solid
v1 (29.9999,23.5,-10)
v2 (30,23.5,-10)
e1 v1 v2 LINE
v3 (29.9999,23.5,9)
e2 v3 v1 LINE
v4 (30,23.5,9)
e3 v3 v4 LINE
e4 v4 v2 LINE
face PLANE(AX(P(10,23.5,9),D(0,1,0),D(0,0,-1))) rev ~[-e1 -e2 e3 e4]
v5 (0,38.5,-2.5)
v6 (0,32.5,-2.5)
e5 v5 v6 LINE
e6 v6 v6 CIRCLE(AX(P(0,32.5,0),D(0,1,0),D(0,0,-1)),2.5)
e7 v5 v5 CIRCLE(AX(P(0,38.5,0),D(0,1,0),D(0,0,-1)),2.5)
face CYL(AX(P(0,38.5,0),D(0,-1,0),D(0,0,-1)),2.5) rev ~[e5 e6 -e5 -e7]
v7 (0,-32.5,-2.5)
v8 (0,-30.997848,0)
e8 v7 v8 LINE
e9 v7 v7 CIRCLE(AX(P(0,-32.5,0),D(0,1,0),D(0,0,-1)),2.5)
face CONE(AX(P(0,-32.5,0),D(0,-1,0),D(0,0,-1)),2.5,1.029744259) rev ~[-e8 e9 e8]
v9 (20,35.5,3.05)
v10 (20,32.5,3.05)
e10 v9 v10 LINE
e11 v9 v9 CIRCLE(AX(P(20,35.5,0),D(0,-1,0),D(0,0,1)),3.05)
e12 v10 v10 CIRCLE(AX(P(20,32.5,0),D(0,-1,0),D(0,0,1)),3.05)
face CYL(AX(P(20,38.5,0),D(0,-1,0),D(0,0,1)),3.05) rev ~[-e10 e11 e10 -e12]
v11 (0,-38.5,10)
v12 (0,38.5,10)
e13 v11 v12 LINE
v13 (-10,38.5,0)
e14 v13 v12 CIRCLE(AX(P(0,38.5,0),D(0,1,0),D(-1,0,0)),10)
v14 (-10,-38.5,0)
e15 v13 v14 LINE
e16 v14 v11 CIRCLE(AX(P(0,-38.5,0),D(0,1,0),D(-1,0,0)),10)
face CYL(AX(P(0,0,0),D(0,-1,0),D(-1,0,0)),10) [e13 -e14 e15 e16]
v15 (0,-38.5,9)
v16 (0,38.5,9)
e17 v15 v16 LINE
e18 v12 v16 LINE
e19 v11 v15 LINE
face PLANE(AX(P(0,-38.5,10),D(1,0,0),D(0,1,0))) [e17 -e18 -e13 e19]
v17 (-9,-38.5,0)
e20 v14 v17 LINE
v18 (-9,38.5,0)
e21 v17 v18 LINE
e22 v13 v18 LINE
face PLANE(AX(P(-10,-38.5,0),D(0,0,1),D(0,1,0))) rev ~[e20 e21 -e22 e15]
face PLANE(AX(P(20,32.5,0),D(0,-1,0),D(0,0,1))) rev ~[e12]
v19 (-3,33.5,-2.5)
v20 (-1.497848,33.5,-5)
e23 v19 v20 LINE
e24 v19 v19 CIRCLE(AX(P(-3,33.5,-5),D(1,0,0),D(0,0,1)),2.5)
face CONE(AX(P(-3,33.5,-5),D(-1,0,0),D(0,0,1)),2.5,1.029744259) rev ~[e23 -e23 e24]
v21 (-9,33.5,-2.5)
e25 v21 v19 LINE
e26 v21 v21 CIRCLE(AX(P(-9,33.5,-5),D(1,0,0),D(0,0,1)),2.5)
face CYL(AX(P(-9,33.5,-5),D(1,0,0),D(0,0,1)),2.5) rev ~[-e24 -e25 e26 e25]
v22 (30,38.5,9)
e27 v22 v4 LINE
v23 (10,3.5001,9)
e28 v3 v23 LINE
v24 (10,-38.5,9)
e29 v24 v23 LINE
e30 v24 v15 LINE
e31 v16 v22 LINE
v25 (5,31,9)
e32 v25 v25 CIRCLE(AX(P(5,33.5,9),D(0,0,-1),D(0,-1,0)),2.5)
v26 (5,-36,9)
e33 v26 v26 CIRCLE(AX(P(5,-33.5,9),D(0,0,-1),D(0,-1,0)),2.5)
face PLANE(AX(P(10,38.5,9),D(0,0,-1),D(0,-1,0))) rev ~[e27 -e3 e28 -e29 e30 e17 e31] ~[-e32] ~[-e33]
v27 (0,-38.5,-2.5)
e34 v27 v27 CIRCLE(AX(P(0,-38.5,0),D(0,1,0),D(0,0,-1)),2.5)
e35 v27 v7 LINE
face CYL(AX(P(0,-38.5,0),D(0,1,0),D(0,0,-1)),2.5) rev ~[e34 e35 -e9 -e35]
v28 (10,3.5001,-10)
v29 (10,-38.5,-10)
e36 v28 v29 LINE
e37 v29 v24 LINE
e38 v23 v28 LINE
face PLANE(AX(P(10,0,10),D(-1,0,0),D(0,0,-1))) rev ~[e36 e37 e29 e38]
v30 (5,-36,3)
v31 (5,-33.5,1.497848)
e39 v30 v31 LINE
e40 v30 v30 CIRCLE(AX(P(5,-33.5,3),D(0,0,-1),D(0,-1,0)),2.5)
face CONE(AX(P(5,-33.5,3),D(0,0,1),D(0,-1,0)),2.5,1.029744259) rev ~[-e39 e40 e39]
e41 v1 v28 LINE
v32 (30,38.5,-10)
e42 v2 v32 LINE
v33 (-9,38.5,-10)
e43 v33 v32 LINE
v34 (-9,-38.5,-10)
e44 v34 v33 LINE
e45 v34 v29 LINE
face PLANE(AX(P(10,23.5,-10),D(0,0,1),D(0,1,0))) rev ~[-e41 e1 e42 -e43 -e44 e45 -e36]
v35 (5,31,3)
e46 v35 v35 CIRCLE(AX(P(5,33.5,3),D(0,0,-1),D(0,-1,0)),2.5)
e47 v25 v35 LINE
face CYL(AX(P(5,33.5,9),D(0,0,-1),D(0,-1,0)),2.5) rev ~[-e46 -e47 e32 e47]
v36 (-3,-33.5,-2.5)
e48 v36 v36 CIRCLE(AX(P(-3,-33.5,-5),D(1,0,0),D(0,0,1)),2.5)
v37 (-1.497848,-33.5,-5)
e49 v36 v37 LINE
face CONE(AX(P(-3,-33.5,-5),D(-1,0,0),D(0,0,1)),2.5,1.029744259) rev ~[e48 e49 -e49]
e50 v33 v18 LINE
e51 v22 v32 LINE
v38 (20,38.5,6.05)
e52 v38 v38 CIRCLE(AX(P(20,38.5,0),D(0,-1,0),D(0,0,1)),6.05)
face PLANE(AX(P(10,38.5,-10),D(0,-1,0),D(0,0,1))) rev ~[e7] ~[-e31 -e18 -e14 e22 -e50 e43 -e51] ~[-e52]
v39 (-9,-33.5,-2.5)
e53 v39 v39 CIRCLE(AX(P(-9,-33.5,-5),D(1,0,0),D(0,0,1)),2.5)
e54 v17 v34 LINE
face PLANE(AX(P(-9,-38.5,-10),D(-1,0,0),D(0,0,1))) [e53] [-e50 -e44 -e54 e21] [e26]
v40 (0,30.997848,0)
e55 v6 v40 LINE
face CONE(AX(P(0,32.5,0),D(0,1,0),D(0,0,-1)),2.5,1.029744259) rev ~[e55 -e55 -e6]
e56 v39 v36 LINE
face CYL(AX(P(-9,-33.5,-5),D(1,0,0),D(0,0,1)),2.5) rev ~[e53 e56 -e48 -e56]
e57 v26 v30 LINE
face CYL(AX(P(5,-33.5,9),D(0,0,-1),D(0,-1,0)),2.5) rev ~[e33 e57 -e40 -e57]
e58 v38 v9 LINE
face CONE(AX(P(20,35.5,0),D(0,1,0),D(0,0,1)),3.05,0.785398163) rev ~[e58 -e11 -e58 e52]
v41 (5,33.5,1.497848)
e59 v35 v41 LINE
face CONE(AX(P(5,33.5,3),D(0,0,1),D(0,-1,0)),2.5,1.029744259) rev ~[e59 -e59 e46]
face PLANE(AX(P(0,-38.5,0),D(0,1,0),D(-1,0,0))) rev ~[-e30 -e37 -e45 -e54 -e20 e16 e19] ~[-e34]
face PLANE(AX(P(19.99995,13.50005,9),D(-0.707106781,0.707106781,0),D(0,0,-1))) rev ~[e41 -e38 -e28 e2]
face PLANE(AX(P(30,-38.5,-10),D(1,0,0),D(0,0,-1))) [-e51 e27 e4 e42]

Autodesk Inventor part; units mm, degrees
ref_plane "YZ Plane" through (0, 0, 0) normal (1, 0, 0) x (0, 1, 0)
ref_plane "XZ Plane" through (0, 0, 0) normal (0, 1, 0) x (-1, 0, 0)
ref_plane "XY Plane" through (0, 0, 0) normal (0, 0, 1) x (1, 0, 0)
sketch "スケッチ1" plane through (0, 0, 0) normal (0, 1, 0) x (-1, 0, 0)
  circle A0 centre (0, 0) radius 10
  line L0 (0, 10) -> (-10, 10)
  line L1 (-10, 10) -> (-10, -10)
  line L2 (-10, -10) -> (10, -10)
  line L3 (10, -10) -> (10, 0)
  dimension "d0" = 20
  dimension "d1" = 10
  dimension "d2" = 10
extrude "押し出し1" add sketch "スケッチ1" along normal mid plane 77
sketch "スケッチ2" plane through (0, -38.5, 10) normal (0, 0, 1) x (1, 0, 0)
  line L0 (10, 0) -> (10, 77) projected
  line L1 (0, 77) -> (10, 77) projected
  line L2 (0, 0) -> (0, 77) projected
  line L3 (10, 0) -> (0, 0) projected
extrude "押し出し2" cut sketch "スケッチ2" against normal blind 1
sketch "スケッチ3" plane through (-10, -38.5, -10) normal (-1, 0, 0) x (0, 0, 1)
  line L0 (0, 77) -> (10, 77) projected
  line L1 (10, 0) -> (10, 77) projected
  line L2 (10, 0) -> (0, 0) projected
  line L3 (0, 0) -> (0, 77) projected
  point P0 (10, 38.5)
extrude "押し出し3" cut sketch "スケッチ3" against normal blind 1
sketch "スケッチ4" plane through (0, -38.5, 9) normal (0, 0, 1) x (1, 0, 0)
  line L0 (0, 77) -> (10, 77) projected
  line L1 (10, 77) -> (10, 0) projected
  line L2 (10, 0) -> (0, 0) projected
  point P0 (0, 38.5)
  point P1 (5, 72)
  point P2 (5, 5)
  dimension "d9" = 5
  dimension "d10" = 5
  dimension "d11" = 5
hole "穴1" at (5, 33.5, 9) at (5, -33.5, 9) direction (0, 0, -1) diameter 5 depth 6 tip angle 118
sketch "スケッチ5" plane through (0, -38.5, 0) normal (0, 1, 0) x (1, 0, 0)
  point P0 (0, 0)
hole "穴2" at (0, -38.5, 0) direction (0, 1, 0) diameter 5 depth 6 tip angle 118
sketch "スケッチ6" plane through (-9, -38.5, -10) normal (-1, 0, 0) x (0, 0, 1)
  line L0 (0, 0) -> (0, 77) projected
  line L1 (0, 77) -> (10, 77) projected
  line L2 (10, 0) -> (0, 0) projected
  point P0 (10, 38.5)
  point P1 (5, 72)
  point P2 (5, 5)
  dimension "d26" = 5
  dimension "d27" = 5
  dimension "d28" = 5
  dimension "d29" = 5
hole "穴3" at (-9, 33.5, -5) at (-9, -33.5, -5) direction (1, 0, 0) diameter 5 depth 6 tip angle 118
mirror "ミラー1" about plane through (0, 0, 0) normal (0, 1, 0) of "穴2"
sketch "スケッチ9" plane through (10, -38.5, -10) normal (1, 0, 0) x (0, 0, -1)
  line L0 (0, 77) -> (-10, 77) projected
  line L1 (-19, 77) -> (-19, 0) projected
  line L2 (0, 77) -> (-19, 77)
  line L3 (-19, 77) -> (-19, 62)
  line L4 (-19, 62) -> (0, 62)
  line L5 (0, 62) -> (0, 77)
  point P0 (-10, 38.5)
  dimension "d47" = 15
extrude "押し出し6" add sketch "スケッチ9" along normal blind 20
sketch "スケッチ10" plane through (0, 38.5, 0) normal (0, 1, 0) x (1, 0, 0)
  line L0 (30, 10) -> (30, -9) projected
  point P0 (0, 0)
  point P1 (20, 0)
  dimension "d50" = 10
hole "穴4" at (20, 38.5, 0) direction (0, -1, 0) diameter 6.1 depth 6
chamfer "面取り2" distance 3 angle 45 1 edges at (20, 38.5, -3.05)
chamfer "面取り3" distance 20 angle 45 1 edges at (10, 23.5, -0.5)
equation "\"d11\" = d9"
properties part number "base8" material "ABS プラスチック"
